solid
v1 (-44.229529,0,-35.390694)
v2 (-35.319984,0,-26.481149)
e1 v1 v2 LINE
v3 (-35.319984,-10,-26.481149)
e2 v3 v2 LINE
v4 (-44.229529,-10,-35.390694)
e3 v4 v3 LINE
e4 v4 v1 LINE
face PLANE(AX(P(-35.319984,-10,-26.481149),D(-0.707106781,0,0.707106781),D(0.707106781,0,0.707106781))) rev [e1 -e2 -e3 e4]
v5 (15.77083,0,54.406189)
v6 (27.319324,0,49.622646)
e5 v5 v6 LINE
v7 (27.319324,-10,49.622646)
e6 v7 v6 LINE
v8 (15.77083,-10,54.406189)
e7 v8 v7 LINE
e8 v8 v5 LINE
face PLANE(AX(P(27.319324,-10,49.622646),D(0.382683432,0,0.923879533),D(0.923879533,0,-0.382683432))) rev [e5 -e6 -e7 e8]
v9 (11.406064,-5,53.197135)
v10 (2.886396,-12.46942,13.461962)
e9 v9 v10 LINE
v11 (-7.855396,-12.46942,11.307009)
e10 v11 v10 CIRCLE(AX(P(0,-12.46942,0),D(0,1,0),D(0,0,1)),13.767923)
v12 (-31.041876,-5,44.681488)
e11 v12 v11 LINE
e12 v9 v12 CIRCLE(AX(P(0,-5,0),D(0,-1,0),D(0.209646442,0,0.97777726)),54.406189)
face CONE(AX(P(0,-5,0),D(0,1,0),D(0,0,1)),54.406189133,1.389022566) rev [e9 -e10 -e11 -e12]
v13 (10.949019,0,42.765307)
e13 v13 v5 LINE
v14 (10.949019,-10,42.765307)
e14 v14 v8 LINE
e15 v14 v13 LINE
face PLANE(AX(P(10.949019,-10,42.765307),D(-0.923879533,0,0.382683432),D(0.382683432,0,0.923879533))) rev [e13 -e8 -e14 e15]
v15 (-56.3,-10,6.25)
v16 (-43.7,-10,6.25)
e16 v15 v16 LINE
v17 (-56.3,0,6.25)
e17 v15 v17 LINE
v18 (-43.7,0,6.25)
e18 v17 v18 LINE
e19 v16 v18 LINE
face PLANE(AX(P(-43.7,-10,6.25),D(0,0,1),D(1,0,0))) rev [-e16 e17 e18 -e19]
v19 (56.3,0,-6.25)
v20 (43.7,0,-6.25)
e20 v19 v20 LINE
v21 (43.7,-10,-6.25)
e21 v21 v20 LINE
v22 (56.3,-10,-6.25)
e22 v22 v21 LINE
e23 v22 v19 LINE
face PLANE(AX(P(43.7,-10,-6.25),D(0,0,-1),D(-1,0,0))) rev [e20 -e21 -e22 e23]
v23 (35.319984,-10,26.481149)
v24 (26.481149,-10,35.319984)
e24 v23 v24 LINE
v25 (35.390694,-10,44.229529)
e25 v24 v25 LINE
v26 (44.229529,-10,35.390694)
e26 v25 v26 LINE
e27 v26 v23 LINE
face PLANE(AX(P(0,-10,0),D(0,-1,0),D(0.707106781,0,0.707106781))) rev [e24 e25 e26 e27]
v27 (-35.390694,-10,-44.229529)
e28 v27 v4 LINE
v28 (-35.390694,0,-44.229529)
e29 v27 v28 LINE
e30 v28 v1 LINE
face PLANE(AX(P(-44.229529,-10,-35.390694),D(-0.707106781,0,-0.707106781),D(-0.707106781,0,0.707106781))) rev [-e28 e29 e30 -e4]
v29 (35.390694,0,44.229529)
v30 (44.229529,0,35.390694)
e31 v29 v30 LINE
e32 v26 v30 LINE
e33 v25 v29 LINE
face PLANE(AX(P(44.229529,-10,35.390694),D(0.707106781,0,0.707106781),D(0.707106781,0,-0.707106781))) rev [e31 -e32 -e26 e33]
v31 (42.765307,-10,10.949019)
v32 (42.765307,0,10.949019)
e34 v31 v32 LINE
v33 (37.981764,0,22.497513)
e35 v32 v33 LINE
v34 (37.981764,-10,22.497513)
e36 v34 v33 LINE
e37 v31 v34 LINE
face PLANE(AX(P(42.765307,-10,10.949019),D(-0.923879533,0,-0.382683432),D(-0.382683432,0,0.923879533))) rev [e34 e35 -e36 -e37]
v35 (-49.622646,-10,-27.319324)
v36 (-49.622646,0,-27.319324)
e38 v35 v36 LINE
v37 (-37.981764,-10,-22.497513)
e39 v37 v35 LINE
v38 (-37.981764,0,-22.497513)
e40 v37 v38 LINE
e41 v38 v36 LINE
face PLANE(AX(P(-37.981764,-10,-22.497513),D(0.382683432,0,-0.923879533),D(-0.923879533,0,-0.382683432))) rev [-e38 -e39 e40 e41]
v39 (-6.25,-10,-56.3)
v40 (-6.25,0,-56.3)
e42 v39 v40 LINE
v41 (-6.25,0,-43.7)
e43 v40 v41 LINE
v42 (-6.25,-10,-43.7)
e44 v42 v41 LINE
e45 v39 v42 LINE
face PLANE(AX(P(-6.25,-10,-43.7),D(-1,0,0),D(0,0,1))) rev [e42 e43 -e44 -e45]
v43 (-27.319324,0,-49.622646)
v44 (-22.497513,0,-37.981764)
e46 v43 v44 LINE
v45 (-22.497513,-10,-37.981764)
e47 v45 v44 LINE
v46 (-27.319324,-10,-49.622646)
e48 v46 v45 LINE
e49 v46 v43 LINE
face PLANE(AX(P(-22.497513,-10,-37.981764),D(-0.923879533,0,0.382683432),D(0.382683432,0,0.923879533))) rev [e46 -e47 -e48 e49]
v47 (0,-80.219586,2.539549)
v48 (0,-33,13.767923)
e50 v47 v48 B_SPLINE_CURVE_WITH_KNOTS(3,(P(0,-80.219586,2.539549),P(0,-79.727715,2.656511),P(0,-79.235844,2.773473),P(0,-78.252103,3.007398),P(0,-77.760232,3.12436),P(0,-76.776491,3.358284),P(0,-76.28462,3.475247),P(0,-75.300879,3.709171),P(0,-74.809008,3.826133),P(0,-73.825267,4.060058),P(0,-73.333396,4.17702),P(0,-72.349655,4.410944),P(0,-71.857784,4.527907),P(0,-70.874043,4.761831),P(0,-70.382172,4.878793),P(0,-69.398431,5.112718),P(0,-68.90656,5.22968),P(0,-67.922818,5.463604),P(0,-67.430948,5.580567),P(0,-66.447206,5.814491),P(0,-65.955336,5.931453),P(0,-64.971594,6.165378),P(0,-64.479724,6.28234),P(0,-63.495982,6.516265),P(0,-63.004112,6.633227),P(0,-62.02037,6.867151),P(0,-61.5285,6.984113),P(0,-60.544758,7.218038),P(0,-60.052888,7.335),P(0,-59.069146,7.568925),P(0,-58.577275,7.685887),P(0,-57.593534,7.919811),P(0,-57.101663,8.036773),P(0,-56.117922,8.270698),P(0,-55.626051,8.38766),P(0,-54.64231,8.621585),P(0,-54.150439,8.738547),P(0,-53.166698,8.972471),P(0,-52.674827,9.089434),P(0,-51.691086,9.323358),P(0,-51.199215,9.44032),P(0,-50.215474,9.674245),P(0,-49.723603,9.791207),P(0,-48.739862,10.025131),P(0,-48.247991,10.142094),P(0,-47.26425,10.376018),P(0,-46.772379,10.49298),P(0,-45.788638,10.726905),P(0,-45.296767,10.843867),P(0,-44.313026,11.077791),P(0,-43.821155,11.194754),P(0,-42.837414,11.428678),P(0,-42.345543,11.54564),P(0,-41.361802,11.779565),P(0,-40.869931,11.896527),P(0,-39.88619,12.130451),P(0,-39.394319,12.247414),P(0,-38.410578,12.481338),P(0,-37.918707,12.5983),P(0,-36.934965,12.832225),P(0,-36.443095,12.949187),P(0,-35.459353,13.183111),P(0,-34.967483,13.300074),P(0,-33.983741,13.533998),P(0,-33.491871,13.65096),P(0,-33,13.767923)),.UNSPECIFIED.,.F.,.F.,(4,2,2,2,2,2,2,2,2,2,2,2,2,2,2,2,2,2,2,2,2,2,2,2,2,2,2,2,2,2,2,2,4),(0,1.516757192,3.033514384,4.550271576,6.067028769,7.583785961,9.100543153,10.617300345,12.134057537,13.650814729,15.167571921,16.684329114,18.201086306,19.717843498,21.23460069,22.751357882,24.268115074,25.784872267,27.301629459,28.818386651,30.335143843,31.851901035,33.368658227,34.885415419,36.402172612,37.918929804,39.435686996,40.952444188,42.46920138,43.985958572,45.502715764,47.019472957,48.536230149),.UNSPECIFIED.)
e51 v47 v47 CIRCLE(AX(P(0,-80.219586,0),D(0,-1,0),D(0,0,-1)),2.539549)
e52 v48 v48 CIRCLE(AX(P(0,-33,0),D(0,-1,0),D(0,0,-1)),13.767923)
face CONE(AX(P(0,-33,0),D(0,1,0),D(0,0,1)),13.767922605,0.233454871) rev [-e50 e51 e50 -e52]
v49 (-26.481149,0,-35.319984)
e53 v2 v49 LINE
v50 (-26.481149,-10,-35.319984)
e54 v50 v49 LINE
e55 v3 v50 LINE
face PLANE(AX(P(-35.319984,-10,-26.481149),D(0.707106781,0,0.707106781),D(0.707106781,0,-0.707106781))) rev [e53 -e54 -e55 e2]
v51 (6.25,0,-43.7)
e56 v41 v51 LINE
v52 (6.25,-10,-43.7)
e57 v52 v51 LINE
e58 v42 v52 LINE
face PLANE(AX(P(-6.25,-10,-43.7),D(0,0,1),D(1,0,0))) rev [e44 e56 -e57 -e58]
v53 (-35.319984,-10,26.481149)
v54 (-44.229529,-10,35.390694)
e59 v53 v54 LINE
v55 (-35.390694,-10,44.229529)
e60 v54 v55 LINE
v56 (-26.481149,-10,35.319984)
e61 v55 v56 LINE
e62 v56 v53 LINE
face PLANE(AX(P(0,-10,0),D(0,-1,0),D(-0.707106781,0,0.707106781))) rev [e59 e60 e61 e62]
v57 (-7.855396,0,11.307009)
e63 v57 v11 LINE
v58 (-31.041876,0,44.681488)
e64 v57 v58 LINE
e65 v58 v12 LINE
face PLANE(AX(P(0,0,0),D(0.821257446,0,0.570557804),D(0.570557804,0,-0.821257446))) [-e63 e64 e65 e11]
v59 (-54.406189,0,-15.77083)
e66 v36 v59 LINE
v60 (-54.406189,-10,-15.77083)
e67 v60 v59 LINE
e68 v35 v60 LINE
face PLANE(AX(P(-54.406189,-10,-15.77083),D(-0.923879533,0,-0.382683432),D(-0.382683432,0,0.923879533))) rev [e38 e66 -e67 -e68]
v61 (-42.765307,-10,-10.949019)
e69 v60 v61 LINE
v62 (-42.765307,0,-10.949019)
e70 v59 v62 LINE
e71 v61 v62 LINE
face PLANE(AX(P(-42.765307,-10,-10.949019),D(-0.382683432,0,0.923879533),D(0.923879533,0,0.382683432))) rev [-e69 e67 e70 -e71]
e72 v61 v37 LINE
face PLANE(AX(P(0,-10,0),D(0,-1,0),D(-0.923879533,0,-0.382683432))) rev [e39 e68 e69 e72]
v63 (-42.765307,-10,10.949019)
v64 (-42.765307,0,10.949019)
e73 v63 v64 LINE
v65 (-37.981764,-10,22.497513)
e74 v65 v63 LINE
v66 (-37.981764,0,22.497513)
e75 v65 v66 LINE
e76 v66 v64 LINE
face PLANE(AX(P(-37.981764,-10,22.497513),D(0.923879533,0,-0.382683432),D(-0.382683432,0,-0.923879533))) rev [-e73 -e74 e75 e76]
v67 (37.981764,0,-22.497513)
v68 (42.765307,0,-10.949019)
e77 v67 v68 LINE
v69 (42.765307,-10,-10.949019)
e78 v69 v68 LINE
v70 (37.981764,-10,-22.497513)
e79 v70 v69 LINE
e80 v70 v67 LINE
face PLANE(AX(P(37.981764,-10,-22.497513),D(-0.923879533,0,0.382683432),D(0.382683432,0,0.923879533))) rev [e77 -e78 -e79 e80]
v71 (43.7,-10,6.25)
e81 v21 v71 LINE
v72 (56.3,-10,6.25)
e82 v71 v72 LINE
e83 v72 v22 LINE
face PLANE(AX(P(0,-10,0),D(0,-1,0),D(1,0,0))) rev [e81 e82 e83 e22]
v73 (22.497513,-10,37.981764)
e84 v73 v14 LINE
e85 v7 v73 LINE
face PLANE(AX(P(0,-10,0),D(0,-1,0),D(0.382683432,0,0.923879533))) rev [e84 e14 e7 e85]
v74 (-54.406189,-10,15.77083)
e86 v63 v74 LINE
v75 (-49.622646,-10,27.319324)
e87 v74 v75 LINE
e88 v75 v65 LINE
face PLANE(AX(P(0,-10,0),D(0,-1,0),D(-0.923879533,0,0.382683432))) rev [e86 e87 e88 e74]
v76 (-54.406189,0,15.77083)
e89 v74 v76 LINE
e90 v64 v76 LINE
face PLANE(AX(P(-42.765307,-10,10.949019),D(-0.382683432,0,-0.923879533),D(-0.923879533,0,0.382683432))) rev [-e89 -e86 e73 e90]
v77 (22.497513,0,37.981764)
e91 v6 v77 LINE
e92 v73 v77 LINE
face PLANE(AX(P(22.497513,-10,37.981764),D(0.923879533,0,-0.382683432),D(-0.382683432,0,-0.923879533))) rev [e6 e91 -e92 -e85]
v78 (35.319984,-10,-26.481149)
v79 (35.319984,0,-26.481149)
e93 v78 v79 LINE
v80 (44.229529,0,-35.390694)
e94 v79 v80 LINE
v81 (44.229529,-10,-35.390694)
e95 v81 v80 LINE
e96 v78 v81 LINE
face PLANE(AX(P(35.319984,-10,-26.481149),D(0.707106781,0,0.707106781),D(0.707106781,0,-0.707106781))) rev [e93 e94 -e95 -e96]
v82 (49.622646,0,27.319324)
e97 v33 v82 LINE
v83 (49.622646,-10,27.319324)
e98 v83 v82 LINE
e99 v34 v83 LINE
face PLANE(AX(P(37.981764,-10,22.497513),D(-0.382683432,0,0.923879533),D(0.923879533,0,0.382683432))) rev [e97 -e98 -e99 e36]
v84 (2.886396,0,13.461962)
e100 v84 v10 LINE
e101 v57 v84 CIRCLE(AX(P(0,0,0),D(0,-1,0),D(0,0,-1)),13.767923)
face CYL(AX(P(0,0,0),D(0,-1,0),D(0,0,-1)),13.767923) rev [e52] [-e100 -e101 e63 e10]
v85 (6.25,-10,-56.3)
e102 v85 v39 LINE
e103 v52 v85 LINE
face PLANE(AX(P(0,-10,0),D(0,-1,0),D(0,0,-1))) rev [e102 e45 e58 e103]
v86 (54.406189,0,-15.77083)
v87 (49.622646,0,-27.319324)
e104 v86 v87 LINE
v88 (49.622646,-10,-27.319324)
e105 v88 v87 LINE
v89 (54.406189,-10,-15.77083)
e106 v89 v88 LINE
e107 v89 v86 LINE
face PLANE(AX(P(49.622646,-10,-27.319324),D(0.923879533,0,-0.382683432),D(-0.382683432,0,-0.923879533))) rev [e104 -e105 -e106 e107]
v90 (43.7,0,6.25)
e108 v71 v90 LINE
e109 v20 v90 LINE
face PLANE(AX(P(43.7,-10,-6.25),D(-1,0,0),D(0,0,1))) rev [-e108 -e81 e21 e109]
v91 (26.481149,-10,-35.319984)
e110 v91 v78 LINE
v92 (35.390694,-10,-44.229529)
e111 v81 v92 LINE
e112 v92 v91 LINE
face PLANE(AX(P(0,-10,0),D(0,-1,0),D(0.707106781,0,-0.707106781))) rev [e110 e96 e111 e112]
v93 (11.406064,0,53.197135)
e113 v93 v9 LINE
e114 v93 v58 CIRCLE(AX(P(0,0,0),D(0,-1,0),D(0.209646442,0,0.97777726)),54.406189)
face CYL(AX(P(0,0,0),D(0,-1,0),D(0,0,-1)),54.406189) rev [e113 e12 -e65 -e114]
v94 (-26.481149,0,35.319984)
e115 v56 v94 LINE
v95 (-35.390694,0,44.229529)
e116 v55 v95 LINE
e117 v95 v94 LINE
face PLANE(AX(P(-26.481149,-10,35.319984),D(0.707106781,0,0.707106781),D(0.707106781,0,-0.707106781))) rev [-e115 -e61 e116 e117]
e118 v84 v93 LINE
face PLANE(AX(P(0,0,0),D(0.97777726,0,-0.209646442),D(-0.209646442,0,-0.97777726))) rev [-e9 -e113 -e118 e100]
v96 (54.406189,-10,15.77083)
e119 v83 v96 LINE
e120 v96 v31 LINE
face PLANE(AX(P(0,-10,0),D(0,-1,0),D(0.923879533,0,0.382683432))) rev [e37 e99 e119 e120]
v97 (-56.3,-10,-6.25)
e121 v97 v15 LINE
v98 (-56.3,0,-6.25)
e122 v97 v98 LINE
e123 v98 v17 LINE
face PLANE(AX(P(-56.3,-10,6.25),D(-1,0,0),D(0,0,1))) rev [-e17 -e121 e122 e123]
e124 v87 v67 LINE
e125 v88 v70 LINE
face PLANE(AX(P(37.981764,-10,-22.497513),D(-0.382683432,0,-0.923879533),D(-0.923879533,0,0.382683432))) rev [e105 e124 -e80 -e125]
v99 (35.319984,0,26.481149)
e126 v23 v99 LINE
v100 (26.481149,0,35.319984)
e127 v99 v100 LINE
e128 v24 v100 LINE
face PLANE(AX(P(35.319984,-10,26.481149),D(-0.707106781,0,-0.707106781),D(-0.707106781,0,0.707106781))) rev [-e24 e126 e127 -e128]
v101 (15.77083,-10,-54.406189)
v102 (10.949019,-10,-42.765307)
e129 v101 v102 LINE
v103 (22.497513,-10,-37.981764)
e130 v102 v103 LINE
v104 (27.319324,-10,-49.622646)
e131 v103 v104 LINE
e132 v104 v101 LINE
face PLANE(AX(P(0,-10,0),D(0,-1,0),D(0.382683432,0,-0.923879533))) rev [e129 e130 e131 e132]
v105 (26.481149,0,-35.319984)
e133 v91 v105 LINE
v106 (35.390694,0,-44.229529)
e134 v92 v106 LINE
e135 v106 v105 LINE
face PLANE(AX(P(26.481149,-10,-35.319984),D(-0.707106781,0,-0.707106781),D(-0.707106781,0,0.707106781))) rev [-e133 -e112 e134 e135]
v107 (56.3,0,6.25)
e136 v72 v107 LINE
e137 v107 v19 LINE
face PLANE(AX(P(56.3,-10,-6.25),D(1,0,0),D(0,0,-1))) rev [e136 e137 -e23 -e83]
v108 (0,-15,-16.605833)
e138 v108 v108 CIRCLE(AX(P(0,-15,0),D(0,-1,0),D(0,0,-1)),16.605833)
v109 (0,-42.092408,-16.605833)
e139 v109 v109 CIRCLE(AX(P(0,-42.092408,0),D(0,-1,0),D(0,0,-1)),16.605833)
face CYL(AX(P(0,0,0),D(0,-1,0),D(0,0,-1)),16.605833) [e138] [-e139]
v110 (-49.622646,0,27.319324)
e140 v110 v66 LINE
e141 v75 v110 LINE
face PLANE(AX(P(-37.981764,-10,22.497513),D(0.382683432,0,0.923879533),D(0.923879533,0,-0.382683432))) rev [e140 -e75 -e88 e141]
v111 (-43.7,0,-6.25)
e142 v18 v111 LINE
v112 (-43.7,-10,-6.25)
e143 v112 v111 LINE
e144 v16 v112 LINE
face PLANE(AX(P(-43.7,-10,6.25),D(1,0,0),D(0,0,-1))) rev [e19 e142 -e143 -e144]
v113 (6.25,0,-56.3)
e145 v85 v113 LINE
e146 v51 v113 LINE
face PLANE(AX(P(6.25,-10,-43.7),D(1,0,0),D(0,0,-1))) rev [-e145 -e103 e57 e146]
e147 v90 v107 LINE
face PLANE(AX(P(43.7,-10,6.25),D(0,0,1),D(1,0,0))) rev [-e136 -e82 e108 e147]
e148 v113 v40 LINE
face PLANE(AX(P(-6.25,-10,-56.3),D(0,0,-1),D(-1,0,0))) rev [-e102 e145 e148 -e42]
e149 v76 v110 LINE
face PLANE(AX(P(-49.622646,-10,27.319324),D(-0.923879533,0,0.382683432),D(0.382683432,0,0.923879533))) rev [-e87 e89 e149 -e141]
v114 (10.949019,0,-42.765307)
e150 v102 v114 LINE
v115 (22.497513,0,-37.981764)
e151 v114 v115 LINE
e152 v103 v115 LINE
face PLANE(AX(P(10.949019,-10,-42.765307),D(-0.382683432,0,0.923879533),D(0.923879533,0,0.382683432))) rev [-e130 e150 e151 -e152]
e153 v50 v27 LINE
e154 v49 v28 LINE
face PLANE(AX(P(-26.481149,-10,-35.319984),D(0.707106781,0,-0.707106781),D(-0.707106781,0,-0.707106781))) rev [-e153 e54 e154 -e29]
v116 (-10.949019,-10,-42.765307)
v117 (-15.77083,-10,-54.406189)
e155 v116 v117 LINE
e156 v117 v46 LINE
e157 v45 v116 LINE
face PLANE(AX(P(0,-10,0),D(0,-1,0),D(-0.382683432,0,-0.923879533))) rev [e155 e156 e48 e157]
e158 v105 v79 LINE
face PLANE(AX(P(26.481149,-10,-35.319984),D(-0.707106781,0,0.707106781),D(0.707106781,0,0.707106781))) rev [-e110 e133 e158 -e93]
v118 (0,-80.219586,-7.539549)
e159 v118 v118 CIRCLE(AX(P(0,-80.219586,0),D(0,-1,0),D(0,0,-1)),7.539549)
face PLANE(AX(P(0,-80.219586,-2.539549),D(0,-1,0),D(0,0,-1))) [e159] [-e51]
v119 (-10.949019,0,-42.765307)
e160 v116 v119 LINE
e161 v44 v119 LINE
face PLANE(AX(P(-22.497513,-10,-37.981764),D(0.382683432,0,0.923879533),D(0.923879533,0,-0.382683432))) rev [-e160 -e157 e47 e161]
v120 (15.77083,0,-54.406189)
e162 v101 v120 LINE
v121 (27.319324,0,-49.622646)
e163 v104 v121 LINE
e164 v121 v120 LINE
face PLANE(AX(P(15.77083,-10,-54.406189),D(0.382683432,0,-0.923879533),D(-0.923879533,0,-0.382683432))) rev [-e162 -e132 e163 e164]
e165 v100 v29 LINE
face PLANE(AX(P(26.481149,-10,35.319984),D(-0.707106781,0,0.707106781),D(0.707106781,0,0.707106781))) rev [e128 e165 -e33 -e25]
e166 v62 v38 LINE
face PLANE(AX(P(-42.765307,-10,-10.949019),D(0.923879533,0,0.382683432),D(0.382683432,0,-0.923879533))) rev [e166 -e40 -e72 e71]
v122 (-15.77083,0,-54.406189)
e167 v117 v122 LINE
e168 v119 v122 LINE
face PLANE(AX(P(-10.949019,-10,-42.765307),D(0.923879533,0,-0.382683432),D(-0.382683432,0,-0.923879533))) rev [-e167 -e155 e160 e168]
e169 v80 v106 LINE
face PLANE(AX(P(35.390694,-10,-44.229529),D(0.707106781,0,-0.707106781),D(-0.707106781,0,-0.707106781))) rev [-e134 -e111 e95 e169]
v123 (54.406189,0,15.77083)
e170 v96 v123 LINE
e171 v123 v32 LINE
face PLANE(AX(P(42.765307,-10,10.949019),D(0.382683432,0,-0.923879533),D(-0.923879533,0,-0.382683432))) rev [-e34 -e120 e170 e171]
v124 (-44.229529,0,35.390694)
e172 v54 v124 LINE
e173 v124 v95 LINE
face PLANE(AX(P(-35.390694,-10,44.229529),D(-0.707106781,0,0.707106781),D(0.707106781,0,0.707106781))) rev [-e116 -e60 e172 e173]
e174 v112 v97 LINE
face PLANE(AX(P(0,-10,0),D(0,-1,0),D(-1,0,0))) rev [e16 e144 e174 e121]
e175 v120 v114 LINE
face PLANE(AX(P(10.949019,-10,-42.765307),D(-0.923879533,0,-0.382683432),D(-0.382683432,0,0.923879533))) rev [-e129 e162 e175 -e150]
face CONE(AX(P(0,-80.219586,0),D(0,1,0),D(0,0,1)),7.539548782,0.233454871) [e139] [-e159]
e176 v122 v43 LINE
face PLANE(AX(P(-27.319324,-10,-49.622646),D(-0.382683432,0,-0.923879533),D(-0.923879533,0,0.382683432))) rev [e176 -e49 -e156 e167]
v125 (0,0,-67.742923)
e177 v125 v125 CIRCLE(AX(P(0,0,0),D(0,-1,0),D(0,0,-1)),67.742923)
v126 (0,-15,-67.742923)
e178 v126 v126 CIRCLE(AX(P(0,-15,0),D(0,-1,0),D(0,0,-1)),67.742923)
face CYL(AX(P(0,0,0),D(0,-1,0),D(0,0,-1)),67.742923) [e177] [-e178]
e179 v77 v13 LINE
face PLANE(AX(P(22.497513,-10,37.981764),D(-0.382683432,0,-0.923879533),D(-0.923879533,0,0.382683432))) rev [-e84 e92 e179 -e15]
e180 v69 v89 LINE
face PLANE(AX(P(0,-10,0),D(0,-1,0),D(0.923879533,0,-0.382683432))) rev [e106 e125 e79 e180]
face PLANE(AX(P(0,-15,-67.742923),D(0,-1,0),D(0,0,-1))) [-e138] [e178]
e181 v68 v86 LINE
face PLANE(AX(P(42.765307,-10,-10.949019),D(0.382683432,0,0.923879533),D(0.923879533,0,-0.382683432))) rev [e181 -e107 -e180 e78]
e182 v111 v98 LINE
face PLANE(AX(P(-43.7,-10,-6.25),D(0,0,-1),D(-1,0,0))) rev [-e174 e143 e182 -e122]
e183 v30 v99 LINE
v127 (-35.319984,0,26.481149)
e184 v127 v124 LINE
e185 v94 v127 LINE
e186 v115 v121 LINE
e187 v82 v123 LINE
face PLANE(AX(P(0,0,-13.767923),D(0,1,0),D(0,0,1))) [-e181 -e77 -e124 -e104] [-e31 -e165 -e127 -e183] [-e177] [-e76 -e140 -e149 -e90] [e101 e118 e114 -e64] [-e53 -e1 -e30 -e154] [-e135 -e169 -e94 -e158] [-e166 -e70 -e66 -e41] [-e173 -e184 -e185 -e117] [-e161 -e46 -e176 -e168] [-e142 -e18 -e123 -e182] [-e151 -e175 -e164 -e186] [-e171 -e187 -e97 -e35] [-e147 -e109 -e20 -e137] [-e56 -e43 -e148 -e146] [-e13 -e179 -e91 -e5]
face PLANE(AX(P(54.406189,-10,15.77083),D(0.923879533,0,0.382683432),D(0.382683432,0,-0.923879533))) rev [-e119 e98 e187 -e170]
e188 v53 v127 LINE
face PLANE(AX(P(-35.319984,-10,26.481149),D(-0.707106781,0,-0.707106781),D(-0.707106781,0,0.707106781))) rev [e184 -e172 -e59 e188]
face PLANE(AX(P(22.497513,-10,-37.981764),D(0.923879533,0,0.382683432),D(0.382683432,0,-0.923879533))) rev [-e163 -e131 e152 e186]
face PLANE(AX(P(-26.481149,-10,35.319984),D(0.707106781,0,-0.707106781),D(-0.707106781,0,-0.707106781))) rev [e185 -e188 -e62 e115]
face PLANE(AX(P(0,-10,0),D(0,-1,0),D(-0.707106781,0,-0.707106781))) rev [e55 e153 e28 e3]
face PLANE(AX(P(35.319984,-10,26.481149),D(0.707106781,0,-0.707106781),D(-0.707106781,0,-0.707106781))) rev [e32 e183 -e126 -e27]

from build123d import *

# Parameters (mm, degrees)
SKETCH3_W          = 12.5
SKETCH3_H          = 12.6
CUT_EXTRUDE1_DEPTH = 10
CIRPATTERN1_COUNT  = 16
CUT_SWEEP3_ANGLE   = 46.890766


# Read off the part's stored shape, not the designer's step: Cut-Sweep3
with BuildPart() as part:
    # Sketch1 → Revolve1 (revolve)
    with BuildSketch(Plane(origin=(0, 0, 0), x_dir=(0, 0, -1), z_dir=(1, 0, 0))):
        Polygon((13.767922605, 0), (67.742922605, 0), (67.742922605, -15), (16.605833346, -15), (16.605833346, -42.092408241), (7.539548782, -80.219585538), (2.539548782, -80.219585538), (13.767922605, -33), align=None)
    revolve(axis=Axis((0, 0, 0), (0, 1, 0)))

    # Sketch3 → Cut-Extrude1 (cut)
    with BuildSketch(Plane(origin=(0, 0, 0), x_dir=(1, 0, 0), z_dir=(0, 1, 0))):
        with Locations((0, 50)):
            Rectangle(SKETCH3_W, SKETCH3_H)
    cut_extrude1 = extrude(amount=-CUT_EXTRUDE1_DEPTH, mode=Mode.SUBTRACT)

    # CirPattern1: Cut-Extrude1 ×16 about axis, 2 skipped
    cirpattern1_axis = Axis((0, 0, 0), (0, -1, 0))
    add([cut_extrude1.rotate(cirpattern1_axis, i * 360 / CIRPATTERN1_COUNT) for i in range(1, CIRPATTERN1_COUNT) if i not in (8, 9)], mode=Mode.SUBTRACT)

    # Cut-Sweep3 outline → Cut-Sweep3 (revolve, cut)
    with BuildSketch(Plane(origin=(0, 0, 0), x_dir=(-0.5705578043075069, 0, 0.8212574455941308), z_dir=(-0.8212574455941308, 0, -0.5705578043075069))):
        Polygon((54.406189133, -5), (54.406189133, 0), (13.767922605, 0), (13.767922605, -12.46941978), align=None)
    revolve(axis=Axis((0, 0, 0), (0, 1, 0)), revolution_arc=CUT_SWEEP3_ANGLE, mode=Mode.SUBTRACT)


solid = part.part
